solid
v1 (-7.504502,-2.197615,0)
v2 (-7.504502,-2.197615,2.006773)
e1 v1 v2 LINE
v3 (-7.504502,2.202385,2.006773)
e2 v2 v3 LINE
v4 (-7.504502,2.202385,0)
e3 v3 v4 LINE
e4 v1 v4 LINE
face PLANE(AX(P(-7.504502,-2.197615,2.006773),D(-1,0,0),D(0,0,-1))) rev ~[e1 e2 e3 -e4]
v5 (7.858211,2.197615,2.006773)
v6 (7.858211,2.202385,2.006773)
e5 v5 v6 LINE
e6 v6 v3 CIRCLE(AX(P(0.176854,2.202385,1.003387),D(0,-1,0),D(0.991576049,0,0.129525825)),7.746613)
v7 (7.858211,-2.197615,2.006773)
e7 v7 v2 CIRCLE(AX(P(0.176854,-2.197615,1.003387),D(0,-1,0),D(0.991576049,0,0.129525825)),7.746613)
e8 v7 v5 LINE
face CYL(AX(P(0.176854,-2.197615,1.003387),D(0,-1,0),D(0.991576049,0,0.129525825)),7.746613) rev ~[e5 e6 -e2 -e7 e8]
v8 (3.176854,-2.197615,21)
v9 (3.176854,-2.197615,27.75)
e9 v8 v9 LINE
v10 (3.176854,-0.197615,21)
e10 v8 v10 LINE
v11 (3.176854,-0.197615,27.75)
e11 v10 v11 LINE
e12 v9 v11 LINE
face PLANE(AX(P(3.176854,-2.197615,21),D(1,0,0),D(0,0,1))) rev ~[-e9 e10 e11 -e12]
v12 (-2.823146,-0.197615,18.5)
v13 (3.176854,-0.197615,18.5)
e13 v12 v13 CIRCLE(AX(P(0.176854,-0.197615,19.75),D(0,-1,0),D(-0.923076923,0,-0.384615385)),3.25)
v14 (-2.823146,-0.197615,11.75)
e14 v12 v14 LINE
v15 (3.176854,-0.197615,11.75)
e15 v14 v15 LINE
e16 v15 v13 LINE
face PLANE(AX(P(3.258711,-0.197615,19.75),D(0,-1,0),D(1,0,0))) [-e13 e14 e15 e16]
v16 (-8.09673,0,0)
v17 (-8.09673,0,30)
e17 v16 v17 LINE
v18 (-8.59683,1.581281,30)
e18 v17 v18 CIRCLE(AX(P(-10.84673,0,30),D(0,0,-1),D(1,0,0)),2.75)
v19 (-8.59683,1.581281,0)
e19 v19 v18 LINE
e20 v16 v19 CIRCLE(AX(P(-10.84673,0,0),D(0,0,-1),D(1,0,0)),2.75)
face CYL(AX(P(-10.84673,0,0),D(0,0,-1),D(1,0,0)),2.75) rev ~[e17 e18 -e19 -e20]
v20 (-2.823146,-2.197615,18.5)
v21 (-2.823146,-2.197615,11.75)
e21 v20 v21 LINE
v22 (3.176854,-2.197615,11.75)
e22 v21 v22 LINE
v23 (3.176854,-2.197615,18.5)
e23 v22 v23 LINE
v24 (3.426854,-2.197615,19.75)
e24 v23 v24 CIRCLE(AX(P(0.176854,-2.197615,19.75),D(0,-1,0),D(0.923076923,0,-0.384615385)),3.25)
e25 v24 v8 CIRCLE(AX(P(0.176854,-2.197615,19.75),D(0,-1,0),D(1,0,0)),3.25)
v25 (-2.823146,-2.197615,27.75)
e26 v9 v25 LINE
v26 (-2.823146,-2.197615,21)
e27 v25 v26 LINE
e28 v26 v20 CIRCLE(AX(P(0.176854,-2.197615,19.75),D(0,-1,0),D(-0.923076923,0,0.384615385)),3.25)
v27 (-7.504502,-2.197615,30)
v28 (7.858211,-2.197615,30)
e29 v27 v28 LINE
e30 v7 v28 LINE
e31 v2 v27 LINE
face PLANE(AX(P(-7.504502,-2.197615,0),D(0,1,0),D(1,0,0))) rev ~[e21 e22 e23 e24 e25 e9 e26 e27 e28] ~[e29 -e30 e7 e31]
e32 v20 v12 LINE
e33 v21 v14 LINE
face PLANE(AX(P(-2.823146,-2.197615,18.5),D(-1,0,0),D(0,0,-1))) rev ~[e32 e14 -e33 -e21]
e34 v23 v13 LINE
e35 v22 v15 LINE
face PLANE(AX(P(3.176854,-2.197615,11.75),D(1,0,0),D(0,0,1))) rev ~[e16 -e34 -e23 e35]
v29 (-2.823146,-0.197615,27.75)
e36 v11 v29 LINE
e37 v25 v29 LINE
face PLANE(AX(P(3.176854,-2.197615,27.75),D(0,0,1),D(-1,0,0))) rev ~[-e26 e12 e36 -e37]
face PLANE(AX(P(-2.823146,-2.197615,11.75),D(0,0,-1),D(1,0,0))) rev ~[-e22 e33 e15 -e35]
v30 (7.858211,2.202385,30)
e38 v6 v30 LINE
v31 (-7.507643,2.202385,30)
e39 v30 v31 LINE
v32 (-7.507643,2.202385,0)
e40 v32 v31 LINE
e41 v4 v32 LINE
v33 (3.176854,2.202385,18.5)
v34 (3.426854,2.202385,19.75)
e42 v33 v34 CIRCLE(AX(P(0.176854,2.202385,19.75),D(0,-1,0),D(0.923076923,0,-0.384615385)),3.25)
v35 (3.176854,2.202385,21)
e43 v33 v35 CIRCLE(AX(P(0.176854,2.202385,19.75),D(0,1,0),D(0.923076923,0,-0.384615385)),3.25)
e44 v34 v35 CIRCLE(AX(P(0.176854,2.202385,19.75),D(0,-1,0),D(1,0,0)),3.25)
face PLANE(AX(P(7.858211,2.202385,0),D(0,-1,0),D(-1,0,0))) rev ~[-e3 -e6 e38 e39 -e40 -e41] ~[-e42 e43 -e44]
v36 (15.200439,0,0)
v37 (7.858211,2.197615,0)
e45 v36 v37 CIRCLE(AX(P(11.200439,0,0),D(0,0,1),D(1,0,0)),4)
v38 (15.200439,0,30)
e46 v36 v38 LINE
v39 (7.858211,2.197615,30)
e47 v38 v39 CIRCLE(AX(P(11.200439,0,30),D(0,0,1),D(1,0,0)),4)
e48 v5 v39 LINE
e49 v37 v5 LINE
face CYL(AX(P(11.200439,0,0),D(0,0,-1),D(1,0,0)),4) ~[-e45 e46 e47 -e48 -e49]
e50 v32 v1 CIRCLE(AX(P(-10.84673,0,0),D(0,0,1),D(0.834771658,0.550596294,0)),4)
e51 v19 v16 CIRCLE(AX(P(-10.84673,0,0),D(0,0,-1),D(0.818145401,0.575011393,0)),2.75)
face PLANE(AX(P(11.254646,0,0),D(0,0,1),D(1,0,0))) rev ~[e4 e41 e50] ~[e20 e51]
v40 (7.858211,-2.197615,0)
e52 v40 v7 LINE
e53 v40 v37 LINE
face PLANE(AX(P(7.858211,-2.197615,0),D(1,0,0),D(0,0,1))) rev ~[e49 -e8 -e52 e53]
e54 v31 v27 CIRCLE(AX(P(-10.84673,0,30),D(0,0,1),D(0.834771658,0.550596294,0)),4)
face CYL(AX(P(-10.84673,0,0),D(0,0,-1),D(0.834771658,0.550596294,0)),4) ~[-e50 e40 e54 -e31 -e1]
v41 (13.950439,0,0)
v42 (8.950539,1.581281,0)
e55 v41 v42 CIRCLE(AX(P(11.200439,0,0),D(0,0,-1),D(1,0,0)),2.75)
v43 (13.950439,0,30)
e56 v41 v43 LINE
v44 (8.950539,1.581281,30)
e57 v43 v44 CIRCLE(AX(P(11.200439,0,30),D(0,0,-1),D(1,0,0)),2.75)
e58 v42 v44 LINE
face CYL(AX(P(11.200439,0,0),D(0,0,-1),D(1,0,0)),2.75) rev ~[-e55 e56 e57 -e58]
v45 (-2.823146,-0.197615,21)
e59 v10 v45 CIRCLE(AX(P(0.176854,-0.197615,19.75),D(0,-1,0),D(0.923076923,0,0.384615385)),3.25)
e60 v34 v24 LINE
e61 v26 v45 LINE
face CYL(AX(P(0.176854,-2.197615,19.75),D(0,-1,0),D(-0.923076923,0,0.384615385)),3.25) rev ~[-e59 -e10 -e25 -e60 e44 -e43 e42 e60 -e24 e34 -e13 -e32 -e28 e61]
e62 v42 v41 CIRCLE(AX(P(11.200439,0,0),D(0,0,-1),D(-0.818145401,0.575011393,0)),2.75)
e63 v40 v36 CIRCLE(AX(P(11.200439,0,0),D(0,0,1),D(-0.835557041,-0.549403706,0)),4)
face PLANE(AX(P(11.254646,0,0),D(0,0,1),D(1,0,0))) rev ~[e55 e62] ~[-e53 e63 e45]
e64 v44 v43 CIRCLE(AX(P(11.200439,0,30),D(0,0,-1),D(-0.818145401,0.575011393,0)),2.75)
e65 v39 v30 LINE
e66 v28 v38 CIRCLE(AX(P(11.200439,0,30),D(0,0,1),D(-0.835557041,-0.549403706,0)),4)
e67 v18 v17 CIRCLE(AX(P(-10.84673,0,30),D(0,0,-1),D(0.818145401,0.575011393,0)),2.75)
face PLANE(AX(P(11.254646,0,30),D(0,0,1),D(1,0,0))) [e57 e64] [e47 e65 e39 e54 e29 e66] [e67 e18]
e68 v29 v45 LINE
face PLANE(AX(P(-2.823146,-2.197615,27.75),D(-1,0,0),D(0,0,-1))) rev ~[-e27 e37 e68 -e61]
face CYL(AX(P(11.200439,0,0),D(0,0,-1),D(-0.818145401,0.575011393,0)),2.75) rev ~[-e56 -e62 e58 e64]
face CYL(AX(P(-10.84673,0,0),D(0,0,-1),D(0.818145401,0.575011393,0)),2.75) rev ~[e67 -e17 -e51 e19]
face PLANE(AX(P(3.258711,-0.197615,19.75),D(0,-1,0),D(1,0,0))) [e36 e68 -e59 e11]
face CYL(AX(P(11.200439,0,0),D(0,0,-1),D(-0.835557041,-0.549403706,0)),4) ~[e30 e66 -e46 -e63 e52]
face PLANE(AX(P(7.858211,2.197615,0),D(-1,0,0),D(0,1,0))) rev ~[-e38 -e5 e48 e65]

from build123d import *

# Parameters (mm, degrees)
F1_DEPTH = 30
F3_DEPTH = 4.4
F4_DEPTH = 2
F5_DEPTH = 2.4
F7_DEPTH = 4.4


with BuildPart() as f1:
    # F0 (on Top) → F1 (new body)
    with BuildSketch(Plane.XY):
        with BuildLine():
            Line((7.8582108495, 2.1976148234), (7.8582108495, 1.5812813318))
            Line((7.8582108495, 1.5812813318), (7.8582108495, -2.1976148234))
            ThreePointArc((7.8582108495, -2.1976148234), (12.3474105352, -3.8320303136), (15.2004390117, 0))
            ThreePointArc((15.2004390117, 0), (12.3474105352, 3.8320303136), (7.8582108495, 2.1976148234))
        make_face()
        with BuildLine():
            ThreePointArc((8.9505391584, 1.5812813318), (12.0296782424, 2.6219958616), (13.9504390117, 0))
            ThreePointArc((13.9504390117, 0), (10.3711997809, -2.6219958616), (8.9505391584, 1.5812813318))
        make_face(mode=Mode.SUBTRACT)
        with BuildLine():
            Line((7.8582108495, -2.1976148234), (7.8582108495, 1.5812813318))
            Line((7.8582108495, 1.5812813318), (7.5262657237, 1.5812813318))
            ThreePointArc((7.5262657237, 1.5812813318), (7.2157826444, -0.3500194778), (7.8582108495, -2.1976148234))
        make_face()
        with BuildLine():
            Line((7.5262657237, 1.5812813318), (7.8582108495, 1.5812813318))
            Line((7.8582108495, 1.5812813318), (7.8582108495, 2.1976148234))
            ThreePointArc((7.8582108495, 2.1976148234), (7.6787293316, 1.8967237357), (7.5262657237, 1.5812813318))
        make_face()
        with BuildLine():
            ThreePointArc((7.8582108495, -2.1976148234), (7.2157826444, -0.3500194778), (7.5262657237, 1.5812813318))
            Line((7.5262657237, 1.5812813318), (-7.1725568309, 1.5812813318))
            ThreePointArc((-7.1725568309, 1.5812813318), (-6.9290335283, 0.8072505337), (-6.8467301189, 0))
            ThreePointArc((-6.8467301189, 0), (-7.0146998053, -1.1469715235), (-7.5045019567, -2.1976148234))
            Line((-7.5045019567, -2.1976148234), (7.8582108495, -2.1976148234))
        make_face()
        with BuildLine():
            Line((-7.1725568309, 1.5812813318), (7.5262657237, 1.5812813318))
            ThreePointArc((7.5262657237, 1.5812813318), (7.6787293316, 1.8967237357), (7.8582108495, 2.1976148234))
            Line((7.8582108495, 2.1976148234), (7.8582108495, 2.2023851766))
            Line((7.8582108495, 2.2023851766), (-7.5076434872, 2.2023851766))
            ThreePointArc((-7.5076434872, 2.2023851766), (-7.3263755669, 1.8992376967), (-7.1725568309, 1.5812813318))
        make_face()
        with BuildLine():
            ThreePointArc((-6.8467301189, 0), (-6.9290335283, 0.8072505337), (-7.1725568309, 1.5812813318))
            Line((-7.1725568309, 1.5812813318), (-7.5076434872, 1.5812813318))
            Line((-7.5076434872, 1.5812813318), (-7.5076434872, -2.1976148234))
            Line((-7.5076434872, -2.1976148234), (-7.5045019567, -2.1976148234))
            ThreePointArc((-7.5045019567, -2.1976148234), (-7.0146998053, -1.1469715235), (-6.8467301189, 0))
        make_face()
        with BuildLine():
            Line((-7.5076434872, 1.5812813318), (-7.1725568309, 1.5812813318))
            ThreePointArc((-7.1725568309, 1.5812813318), (-7.3263755669, 1.8992376967), (-7.5076434872, 2.2023851766))
            Line((-7.5076434872, 2.2023851766), (-7.5076434872, 1.5812813318))
        make_face()
        with BuildLine():
            ThreePointArc((-7.5076434872, 2.2023851766), (-14.8467290993, -0.0028559361), (-7.5045019567, -2.1976148234))
            Line((-7.5045019567, -2.1976148234), (-7.5076434872, -2.1976148234))
            Line((-7.5076434872, -2.1976148234), (-7.5076434872, 1.5812813318))
            Line((-7.5076434872, 1.5812813318), (-7.5076434872, 2.2023851766))
        make_face()
        with BuildLine():
            ThreePointArc((-8.0967301189, 0), (-13.4687259805, -0.8292392307), (-8.5968302656, 1.5812813318))
            ThreePointArc((-8.5968302656, 1.5812813318), (-8.2247342573, 0.8292392307), (-8.0967301189, 0))
        make_face(mode=Mode.SUBTRACT)
    extrude(amount=F1_DEPTH)

    # F2 (on face) → F3 (cut, through all)
    with BuildSketch(Plane.XZ.offset(2.1976148234)):
        with BuildLine():
            Line((3.1768544464, 18.5), (3.1768544464, 21))
            ThreePointArc((3.1768544464, 21), (0.1768544464, 23), (-2.8231455536, 21))
            Line((-2.8231455536, 21), (-2.8231455536, 18.5))
            ThreePointArc((-2.8231455536, 18.5), (0.1768544464, 16.5), (3.1768544464, 18.5))
        make_face()
    extrude(amount=-F3_DEPTH, mode=Mode.SUBTRACT)

    # F2 (on face) → F4 (cut)
    with BuildSketch(Plane.XZ.offset(2.1976148234)):
        with BuildLine():
            ThreePointArc((3.1768544464, 18.5), (3.3637416424, 19.1126225608), (3.4268544464, 19.75))
            ThreePointArc((3.4268544464, 19.75), (3.3637416424, 20.3873774392), (3.1768544464, 21))
            Line((3.1768544464, 21), (3.1768544464, 18.5))
        make_face()
        with BuildLine():
            Line((3.1768544464, 18.5), (3.1768544464, 21))
            ThreePointArc((3.1768544464, 21), (0.1768544464, 23), (-2.8231455536, 21))
            Line((-2.8231455536, 21), (-2.8231455536, 18.5))
            ThreePointArc((-2.8231455536, 18.5), (0.1768544464, 16.5), (3.1768544464, 18.5))
        make_face()
        with BuildLine():
            ThreePointArc((-2.8231455536, 21), (0.1768544464, 23), (3.1768544464, 21))
            Line((3.1768544464, 21), (3.1768544464, 27.75))
            Line((3.1768544464, 27.75), (-2.8231455536, 27.75))
            Line((-2.8231455536, 27.75), (-2.8231455536, 21))
        make_face()
        with BuildLine():
            Line((3.1768544464, 11.75), (3.1768544464, 18.5))
            ThreePointArc((3.1768544464, 18.5), (0.1768544464, 16.5), (-2.8231455536, 18.5))
            Line((-2.8231455536, 18.5), (-2.8231455536, 11.75))
            Line((-2.8231455536, 11.75), (3.1768544464, 11.75))
        make_face()
        with BuildLine():
            Line((-2.8231455536, 18.5), (-2.8231455536, 21))
            ThreePointArc((-2.8231455536, 21), (-3.0731455536, 19.75), (-2.8231455536, 18.5))
        make_face()
    extrude(amount=-F4_DEPTH, mode=Mode.SUBTRACT)

    # F5 (cut, through all): faces of the model
    f5_faces = [f1.faces().sort_by_distance(p)[0] for p in [
        (-2.9234827298, -0.1976148234, 19.75),
        (3.2771916226, -0.1976148234, 19.75),
    ]]
    extrude(f5_faces, amount=-F5_DEPTH, mode=Mode.SUBTRACT)

    # F6 (on face) → F7 (cut, through all)
    with BuildSketch(Plane.XZ.offset(2.1976148234)):
        with BuildLine():
            Line((-7.5045019567, 0), (7.8582108495, 0))
            Line((7.8582108495, 0), (7.8582108495, 2.0067730067))
            ThreePointArc((7.8582108495, 2.0067730067), (0.1768544464, 8.75), (-7.5045019567, 2.0067730067))
            Line((-7.5045019567, 2.0067730067), (-7.5045019567, 0))
        make_face()
    extrude(amount=-F7_DEPTH, mode=Mode.SUBTRACT)


solid = f1.part
